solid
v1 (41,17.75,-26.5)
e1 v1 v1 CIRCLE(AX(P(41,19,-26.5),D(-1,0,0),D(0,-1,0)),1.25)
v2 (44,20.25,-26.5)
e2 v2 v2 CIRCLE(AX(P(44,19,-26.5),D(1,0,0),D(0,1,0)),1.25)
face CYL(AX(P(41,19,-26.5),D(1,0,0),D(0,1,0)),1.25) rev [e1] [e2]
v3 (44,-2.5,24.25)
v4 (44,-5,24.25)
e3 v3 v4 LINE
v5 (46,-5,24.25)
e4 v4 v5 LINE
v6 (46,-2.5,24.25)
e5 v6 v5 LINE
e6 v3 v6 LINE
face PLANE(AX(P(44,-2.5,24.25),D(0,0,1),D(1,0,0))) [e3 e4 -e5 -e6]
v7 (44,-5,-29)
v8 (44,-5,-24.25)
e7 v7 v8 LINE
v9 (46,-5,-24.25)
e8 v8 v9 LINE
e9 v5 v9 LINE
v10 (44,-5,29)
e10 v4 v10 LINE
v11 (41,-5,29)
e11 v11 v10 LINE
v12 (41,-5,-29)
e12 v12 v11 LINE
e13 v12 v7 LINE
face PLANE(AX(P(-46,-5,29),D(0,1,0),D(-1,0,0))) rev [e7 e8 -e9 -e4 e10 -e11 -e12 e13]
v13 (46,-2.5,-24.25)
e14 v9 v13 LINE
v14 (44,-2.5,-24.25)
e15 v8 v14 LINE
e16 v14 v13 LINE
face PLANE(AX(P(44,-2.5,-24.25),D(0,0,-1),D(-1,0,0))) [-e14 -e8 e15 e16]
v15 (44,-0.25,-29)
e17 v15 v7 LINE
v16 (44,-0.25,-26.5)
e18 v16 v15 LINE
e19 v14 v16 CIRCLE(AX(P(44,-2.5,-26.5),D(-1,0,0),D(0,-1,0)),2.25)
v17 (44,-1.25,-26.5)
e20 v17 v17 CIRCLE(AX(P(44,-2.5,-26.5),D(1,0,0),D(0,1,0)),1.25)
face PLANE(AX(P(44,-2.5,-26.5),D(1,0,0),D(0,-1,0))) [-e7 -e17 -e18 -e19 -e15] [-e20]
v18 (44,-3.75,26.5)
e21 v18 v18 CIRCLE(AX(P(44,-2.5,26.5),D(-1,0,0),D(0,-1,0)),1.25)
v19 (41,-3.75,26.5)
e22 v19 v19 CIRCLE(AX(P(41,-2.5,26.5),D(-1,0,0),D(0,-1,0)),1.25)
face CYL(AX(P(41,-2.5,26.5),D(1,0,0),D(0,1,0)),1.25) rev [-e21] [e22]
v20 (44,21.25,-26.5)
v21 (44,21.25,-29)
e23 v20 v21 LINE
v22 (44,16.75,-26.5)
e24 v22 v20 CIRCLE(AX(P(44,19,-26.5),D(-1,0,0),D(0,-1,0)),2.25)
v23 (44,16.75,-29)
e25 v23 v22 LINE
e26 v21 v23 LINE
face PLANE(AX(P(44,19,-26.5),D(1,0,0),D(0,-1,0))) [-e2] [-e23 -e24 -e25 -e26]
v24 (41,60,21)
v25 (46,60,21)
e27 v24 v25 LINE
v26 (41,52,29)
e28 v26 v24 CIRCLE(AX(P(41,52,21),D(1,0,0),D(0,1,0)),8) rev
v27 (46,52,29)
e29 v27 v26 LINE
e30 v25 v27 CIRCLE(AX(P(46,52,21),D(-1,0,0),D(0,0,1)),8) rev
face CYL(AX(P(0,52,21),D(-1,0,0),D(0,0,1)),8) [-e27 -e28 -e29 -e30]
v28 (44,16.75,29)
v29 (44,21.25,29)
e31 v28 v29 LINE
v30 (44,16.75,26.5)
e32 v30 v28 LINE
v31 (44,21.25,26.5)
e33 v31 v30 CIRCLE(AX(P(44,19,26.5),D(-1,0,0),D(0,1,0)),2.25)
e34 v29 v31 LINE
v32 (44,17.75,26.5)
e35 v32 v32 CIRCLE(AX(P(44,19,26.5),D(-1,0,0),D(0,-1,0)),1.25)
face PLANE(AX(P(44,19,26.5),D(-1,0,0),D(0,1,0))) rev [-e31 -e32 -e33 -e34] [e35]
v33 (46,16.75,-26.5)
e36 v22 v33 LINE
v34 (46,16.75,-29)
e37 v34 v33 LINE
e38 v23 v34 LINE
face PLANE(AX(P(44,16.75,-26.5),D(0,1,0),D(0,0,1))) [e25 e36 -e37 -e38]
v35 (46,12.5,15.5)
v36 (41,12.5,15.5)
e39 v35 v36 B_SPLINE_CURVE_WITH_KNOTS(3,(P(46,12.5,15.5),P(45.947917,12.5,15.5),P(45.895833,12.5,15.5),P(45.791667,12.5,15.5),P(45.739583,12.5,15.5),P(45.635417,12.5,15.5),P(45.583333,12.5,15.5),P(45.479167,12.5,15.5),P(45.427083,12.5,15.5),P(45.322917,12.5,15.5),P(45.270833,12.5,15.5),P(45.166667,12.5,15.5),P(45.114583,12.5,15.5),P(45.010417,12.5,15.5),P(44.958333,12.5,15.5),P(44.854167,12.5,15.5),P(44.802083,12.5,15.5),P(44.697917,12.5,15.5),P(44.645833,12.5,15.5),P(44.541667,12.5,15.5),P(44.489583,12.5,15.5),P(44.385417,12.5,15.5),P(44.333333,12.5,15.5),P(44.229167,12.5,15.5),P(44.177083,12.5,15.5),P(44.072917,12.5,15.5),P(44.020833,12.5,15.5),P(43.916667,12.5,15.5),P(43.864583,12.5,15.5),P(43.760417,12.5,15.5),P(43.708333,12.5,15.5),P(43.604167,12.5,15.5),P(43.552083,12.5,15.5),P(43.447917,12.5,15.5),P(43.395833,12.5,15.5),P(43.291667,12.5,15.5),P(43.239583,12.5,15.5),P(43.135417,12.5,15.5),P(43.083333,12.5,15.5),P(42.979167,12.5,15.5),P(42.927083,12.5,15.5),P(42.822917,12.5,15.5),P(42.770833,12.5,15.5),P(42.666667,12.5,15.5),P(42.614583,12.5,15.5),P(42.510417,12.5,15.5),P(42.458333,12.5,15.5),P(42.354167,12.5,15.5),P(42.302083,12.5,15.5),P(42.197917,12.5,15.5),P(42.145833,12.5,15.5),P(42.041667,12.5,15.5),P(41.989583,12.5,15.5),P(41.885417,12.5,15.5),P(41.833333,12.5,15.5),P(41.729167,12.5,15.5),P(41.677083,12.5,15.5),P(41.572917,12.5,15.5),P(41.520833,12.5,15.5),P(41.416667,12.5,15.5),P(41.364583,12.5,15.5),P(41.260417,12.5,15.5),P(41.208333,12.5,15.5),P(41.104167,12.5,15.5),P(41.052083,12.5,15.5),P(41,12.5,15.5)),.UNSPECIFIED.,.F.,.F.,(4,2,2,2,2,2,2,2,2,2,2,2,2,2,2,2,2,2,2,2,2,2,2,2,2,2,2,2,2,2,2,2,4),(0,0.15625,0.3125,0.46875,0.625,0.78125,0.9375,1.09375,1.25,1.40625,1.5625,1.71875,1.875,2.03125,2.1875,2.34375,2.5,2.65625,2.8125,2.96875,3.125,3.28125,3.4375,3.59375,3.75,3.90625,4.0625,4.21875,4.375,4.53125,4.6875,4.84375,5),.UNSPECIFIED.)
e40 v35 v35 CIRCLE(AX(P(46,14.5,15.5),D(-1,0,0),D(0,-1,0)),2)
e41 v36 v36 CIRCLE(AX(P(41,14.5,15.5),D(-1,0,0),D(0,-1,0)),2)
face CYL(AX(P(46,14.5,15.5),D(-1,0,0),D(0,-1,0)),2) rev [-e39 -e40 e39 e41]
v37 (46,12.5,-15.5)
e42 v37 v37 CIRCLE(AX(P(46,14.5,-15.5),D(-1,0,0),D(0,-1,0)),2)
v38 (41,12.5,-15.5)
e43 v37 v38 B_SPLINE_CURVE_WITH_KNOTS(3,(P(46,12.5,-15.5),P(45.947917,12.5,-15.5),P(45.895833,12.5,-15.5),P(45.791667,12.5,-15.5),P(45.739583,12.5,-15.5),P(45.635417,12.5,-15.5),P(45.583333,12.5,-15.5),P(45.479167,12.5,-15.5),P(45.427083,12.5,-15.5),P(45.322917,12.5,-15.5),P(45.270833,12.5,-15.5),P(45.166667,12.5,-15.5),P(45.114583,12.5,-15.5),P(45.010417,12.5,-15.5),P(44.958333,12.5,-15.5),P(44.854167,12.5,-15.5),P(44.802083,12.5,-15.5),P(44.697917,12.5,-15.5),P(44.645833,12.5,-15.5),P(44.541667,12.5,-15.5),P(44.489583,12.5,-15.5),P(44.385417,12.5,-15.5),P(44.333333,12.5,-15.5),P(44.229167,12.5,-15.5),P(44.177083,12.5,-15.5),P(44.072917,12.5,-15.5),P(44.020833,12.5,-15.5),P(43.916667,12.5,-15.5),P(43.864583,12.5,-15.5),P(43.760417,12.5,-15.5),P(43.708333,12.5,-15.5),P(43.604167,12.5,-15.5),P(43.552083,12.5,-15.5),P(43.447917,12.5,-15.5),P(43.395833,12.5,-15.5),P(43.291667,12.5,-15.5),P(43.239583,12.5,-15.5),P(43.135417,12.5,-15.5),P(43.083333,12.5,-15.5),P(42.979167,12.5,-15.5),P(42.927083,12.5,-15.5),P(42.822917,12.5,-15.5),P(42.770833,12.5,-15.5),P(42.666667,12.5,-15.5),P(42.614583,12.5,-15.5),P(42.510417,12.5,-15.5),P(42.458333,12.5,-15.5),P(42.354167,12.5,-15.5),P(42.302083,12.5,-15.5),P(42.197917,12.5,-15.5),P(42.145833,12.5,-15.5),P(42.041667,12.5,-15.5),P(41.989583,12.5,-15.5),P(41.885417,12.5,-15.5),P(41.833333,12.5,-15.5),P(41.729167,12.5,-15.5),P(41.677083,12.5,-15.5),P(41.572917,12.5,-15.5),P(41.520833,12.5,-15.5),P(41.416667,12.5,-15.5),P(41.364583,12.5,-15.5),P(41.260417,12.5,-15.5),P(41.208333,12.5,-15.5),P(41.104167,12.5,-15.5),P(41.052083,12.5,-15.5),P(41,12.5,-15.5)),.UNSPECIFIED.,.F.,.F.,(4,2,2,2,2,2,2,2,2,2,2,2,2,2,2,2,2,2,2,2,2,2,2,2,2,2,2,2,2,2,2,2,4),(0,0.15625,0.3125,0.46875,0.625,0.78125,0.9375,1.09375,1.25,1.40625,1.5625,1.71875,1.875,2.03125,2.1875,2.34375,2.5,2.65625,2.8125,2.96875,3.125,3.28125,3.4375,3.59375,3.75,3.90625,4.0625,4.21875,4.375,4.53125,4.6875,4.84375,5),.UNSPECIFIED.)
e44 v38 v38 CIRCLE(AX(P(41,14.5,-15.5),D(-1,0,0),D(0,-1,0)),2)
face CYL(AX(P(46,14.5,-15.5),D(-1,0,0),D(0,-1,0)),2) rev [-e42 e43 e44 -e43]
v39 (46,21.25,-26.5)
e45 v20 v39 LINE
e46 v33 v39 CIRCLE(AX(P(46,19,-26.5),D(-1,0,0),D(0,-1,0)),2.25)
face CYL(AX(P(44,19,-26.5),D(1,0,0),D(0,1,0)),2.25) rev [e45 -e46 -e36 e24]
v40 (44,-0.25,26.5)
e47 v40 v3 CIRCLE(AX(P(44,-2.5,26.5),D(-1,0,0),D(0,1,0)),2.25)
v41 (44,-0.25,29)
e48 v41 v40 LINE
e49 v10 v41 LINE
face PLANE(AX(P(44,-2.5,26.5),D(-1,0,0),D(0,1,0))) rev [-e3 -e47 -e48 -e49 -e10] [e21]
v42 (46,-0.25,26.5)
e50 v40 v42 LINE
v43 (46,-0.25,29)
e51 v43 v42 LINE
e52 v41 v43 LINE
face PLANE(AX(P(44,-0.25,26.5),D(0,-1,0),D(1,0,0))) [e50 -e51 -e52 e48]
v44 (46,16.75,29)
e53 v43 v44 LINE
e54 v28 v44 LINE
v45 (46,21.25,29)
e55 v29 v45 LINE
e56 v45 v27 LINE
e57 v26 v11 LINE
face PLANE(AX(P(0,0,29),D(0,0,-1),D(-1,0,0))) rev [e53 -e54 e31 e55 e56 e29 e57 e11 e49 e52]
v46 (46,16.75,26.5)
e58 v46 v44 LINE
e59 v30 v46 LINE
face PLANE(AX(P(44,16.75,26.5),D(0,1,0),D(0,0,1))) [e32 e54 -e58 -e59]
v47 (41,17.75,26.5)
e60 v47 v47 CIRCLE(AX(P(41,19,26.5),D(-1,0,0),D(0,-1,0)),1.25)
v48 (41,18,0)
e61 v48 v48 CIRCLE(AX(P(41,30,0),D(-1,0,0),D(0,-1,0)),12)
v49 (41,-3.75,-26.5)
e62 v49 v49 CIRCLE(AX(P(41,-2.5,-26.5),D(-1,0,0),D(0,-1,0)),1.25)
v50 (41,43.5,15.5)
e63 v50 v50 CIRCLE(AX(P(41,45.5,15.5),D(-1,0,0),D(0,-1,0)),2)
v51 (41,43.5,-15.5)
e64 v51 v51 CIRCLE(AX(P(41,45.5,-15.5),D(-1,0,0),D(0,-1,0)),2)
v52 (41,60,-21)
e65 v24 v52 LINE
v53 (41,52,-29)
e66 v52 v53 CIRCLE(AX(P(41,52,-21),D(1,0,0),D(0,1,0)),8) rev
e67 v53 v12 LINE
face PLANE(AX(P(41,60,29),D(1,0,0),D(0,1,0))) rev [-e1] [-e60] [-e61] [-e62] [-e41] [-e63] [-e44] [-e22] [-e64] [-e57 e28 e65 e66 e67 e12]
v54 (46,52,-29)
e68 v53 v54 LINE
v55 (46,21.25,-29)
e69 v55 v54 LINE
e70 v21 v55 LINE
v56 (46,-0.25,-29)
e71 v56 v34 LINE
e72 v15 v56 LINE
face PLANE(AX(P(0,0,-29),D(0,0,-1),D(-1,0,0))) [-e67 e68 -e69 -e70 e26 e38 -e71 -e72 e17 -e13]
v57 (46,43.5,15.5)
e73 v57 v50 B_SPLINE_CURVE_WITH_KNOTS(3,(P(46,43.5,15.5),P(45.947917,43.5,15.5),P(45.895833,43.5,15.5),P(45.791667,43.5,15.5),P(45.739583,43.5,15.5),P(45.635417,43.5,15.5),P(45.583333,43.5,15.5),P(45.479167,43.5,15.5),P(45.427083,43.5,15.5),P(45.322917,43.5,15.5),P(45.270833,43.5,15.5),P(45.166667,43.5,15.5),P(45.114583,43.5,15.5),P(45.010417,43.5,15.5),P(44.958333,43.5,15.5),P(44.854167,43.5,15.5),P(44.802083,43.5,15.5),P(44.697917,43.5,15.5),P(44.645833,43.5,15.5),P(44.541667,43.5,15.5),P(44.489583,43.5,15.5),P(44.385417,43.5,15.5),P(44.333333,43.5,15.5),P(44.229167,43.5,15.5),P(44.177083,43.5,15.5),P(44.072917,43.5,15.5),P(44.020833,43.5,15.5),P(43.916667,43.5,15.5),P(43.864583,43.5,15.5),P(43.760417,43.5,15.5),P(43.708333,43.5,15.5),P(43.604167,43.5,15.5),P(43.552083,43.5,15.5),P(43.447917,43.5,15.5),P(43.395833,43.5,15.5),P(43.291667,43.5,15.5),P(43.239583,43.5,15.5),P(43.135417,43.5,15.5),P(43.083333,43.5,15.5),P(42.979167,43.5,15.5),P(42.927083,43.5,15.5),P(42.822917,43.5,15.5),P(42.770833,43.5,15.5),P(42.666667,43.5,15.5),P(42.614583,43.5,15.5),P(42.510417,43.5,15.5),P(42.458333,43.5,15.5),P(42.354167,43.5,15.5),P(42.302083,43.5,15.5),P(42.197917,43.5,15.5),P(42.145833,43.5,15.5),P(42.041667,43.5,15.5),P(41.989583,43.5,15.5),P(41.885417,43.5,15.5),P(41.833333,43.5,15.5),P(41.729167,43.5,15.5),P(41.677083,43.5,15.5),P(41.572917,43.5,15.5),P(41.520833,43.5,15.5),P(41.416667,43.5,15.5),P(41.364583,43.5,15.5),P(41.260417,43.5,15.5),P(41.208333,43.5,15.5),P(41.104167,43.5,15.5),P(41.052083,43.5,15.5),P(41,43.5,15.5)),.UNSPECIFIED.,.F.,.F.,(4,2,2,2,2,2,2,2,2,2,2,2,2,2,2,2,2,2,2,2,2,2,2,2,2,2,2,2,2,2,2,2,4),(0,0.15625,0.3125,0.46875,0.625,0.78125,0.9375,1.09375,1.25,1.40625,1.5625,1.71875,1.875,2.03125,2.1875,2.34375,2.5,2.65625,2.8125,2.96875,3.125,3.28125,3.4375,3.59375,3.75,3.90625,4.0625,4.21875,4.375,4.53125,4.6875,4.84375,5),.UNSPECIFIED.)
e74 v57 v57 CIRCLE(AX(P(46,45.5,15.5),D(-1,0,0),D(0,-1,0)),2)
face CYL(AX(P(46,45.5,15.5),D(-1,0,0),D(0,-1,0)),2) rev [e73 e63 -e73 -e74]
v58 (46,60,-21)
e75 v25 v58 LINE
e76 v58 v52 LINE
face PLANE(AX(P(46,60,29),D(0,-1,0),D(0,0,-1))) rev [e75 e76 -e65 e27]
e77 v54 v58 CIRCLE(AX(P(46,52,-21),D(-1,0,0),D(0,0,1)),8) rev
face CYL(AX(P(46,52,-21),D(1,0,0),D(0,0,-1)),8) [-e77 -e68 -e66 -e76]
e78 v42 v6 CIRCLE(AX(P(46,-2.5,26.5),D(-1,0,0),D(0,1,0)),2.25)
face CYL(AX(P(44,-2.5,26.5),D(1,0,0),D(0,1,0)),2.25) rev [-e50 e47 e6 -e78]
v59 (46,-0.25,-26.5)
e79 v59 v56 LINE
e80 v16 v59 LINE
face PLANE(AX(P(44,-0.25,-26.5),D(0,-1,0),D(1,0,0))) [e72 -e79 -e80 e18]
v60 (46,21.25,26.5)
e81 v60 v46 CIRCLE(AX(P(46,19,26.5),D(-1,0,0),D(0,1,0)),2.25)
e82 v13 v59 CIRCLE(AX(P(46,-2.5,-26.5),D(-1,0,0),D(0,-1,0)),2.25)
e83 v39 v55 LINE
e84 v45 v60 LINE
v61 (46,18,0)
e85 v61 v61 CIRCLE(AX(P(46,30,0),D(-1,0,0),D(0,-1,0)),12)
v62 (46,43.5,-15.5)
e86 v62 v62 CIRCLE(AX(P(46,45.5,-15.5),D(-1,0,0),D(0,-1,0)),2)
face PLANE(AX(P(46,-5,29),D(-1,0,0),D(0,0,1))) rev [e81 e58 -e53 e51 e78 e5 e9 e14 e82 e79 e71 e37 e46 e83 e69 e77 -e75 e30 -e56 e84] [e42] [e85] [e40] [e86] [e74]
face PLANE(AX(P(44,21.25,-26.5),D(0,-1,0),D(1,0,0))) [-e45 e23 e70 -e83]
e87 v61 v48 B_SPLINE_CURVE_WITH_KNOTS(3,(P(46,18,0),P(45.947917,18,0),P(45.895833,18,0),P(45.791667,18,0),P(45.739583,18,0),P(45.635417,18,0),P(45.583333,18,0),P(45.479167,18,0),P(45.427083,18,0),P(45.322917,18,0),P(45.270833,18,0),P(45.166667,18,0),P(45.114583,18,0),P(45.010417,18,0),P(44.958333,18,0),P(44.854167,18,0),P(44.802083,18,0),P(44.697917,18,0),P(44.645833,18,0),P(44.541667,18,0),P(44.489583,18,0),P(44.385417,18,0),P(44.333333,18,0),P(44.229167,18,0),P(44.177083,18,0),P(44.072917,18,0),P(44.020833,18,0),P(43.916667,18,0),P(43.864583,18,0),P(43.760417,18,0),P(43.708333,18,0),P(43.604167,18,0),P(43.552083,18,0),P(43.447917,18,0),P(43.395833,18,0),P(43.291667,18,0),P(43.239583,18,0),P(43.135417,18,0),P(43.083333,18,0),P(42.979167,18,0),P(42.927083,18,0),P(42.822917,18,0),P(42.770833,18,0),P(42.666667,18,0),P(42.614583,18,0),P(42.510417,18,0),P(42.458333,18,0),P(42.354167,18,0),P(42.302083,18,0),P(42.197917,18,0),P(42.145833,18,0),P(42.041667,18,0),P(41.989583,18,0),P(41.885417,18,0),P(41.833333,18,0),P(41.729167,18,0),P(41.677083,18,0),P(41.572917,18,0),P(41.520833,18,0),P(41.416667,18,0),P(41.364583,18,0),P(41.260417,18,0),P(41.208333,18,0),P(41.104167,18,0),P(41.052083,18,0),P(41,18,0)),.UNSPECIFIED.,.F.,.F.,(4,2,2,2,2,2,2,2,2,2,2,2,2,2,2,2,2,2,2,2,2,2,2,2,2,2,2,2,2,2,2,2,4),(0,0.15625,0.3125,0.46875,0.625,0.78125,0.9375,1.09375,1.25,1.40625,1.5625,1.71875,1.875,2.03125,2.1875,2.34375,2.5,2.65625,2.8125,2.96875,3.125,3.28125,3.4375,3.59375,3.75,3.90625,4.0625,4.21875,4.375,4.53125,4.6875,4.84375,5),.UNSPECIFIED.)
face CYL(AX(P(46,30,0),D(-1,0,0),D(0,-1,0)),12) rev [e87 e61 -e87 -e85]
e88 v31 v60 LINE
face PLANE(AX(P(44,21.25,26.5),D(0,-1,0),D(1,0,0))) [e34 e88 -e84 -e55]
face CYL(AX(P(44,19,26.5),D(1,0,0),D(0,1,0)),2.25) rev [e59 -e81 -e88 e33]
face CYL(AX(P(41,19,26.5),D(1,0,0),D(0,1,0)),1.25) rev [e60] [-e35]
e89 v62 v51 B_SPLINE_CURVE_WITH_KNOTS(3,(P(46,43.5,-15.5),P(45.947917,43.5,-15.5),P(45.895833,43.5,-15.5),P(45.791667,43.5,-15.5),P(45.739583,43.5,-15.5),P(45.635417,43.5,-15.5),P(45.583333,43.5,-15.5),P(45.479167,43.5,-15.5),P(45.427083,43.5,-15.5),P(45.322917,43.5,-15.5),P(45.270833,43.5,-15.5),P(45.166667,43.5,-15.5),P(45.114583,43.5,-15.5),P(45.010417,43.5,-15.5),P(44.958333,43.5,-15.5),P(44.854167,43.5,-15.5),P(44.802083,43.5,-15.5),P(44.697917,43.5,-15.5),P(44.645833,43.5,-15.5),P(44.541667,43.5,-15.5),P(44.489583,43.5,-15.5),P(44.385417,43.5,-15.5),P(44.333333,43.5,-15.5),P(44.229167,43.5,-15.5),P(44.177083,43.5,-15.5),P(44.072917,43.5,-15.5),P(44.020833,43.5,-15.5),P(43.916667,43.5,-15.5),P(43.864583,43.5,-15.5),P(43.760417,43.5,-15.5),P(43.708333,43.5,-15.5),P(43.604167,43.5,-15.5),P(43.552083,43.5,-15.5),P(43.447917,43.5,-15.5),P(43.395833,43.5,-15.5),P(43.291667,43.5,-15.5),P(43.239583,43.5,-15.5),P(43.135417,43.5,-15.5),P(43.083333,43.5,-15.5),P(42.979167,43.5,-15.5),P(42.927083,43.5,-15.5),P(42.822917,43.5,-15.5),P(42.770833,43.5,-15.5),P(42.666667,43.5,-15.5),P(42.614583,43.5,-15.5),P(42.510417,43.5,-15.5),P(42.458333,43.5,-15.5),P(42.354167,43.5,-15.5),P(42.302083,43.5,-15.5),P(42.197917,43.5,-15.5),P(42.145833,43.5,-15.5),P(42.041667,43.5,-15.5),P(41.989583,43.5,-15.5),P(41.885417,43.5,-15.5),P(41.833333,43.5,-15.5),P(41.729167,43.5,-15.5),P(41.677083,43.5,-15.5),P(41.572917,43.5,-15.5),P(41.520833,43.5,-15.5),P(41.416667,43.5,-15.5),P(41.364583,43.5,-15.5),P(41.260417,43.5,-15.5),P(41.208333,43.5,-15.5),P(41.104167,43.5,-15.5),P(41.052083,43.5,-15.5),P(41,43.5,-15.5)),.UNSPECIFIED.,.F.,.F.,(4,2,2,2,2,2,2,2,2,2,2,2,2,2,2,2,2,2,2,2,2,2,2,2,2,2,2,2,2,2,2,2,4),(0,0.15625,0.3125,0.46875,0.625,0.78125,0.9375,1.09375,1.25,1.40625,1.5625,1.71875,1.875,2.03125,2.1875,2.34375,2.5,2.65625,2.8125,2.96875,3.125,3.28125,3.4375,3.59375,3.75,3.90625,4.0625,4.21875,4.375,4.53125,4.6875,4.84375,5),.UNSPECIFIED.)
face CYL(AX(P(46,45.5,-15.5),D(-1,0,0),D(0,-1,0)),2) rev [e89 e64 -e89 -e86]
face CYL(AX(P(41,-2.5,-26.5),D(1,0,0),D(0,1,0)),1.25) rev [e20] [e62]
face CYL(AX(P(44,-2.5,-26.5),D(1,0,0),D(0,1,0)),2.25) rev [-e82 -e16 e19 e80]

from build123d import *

# Parameters (mm, degrees)
RESSALTO_EXTRUS_O1_DEPTH  = 29
CORTE_EXTRUS_O1_REACH     = 115.6
ESBO_O2_R                 = 6.5
ESBO_O3_R                 = 18
CORTE_EXTRUS_O2_DEPTH     = 2.5
CORTE_EXTRUS_O3_START     = -5
ESBO_O5_R                 = 2
ESBO_O5_R_2               = 1.5
CORTE_EXTRUS_O3_DEPTH     = 5
ESBO_O7_R                 = 12
ESBO_O7_R_2               = 2
CORTE_EXTRUS_O4_DEPTH     = 110.590145542
ESBO_O11_W                = 18
ESBO_O11_H                = 10
RESSALTO_EXTRUS_O3_DEPTH  = 8
ESBO_O12_W                = 14.4
ESBO_O12_H                = 6.8
CORTE_EXTRUS_O6_DEPTH     = 3
ESBO_O13_W                = 13.4
ESBO_O13_H                = 5.8
CORTE_EXTRUS_O7_DEPTH     = 5
CORTE_EXTRUS_O8_REACH     = 84.898
RESSALTO_EXTRUS_O4_DEPTH  = 5
ESBO_O17_W                = 2.6
ESBO_O17_H                = 10
RESSALTO_EXTRUS_O5_DEPTH  = 8
CHANFRO1_SIZE             = 5
FILETE1_R                 = 8
ESBO_O18_W                = 20
ESBO_O18_H                = 8
RESSALTO_EXTRUS_O6_DEPTH  = 13
ESBO_O19_R                = 2.25
CORTE_EXTRUS_O9_DEPTH     = 80.252760204
CHANFRO2_SIZE             = 3
CHANFRO2_SIZE_2           = 13
CORTE_EXTRUS_O10_START    = -6
CORTE_EXTRUS_O10_DEPTH    = 74.252760204
ESBO_O21_W                = 26
ESBO_O21_H                = 16
RESSALTO_EXTRUS_O7_DEPTH  = 30
CORTE_EXTRUS_O11_DEPTH    = 26
ESBO_O24_R                = 1
ESBO_O24_W                = 17.2
ESBO_O24_H                = 3
RESSALTO_EXTRUS_O8_DEPTH  = 3
ESBO_O25_W                = 11.2
ESBO_O25_H                = 4
CORTE_EXTRUS_O12_DEPTH    = 2
ESBO_O26_R                = 3.5
CORTE_EXTRUS_O13_DEPTH    = 96.289033997
ESBO_O27_W                = 24
ESBO_O27_H                = 8
RESSALTO_EXTRUS_O9_DEPTH  = 6
ESBO_O28_W                = 1.5
ESBO_O28_H                = 8
RESSALTO_EXTRUS_O10_DEPTH = 2
ESBO_O31_R                = 1
CORTE_EXTRUS_O14_DEPTH    = 85.172442046
ESBO_O32_R                = 1
CORTE_EXTRUS_O15_DEPTH    = 12
ESBO_O33_R                = 1.25
CORTE_EXTRUS_O16_DEPTH    = 5
CORTE_EXTRUS_O17_DEPTH    = 2
ESBO_O36_R                = 71.402948567
CORTE_EXTRUS_O18_DEPTH    = 114.723348526


with BuildPart() as part:
    # Esboço1 → Ressalto-extrusão1 (new, symmetric)
    with BuildSketch(Plane.XY):
        Polygon((0, 0), (-41, 0), (-41, 60), (-46, 60), (-46, -5), (46, -5), (46, 60), (41, 60), (41, 0), align=None)
    extrude(amount=RESSALTO_EXTRUS_O1_DEPTH, both=True)

    # Esboço2 → Corte-extrusão1 (cut, up to next)
    with BuildSketch(Plane.ZY.offset(46), mode=Mode.PRIVATE) as corte_extrus_o1_sk1:
        with Locations(Location((0, 30, 0), (0, 0, 270))):
            Circle(ESBO_O2_R)
    corte_extrus_o1_tool1 = extrude(corte_extrus_o1_sk1.sketch, amount=-CORTE_EXTRUS_O1_REACH, mode=Mode.PRIVATE) & part.part
    add(corte_extrus_o1_tool1.solids().sort_by_distance((-46, 30, 0))[0], mode=Mode.SUBTRACT)

    # Esboço3 → Corte-extrusão2 (cut)
    with BuildSketch(Plane.ZY.offset(46)):
        with Locations(Location((0, 30, 0), (0, 0, 270))):
            Circle(ESBO_O3_R)
    extrude(amount=-CORTE_EXTRUS_O2_DEPTH, mode=Mode.SUBTRACT)

    # Esboço5 → Corte-extrusão3 (cut)
    with BuildSketch(Plane.ZY.offset(46).offset(CORTE_EXTRUS_O3_START)):
        with Locations(Location((-15.5, 45.5, 0), (0, 0, 270))):
            Circle(ESBO_O5_R)
        with Locations(Location((0, 42, 0), (0, 0, 270))):
            Circle(ESBO_O5_R_2)
        with Locations(Location((0, 18, 0), (0, 0, 270))):
            Circle(ESBO_O5_R_2)
        with Locations(Location((0, 54, 0), (0, 0, 270))):
            Circle(ESBO_O5_R)
        with Locations(Location((15.5, 45.5, 0), (0, 0, 270))):
            Circle(ESBO_O5_R)
        with Locations(Location((15.5, 14.5, 0), (0, 0, 270))):
            Circle(ESBO_O5_R)
        with Locations(Location((-15.5, 14.5, 0), (0, 0, 270))):
            Circle(ESBO_O5_R)
        with Locations(Location((20.784609691, 18, 0), (0, 0, 270))):
            Circle(ESBO_O5_R)
        with Locations(Location((-20.784609691, 18, 0), (0, 0, 270))):
            Circle(ESBO_O5_R)
        with BuildLine():
            Line((-8, 31.5), (8, 31.5))
            ThreePointArc((8, 31.5), (9.5, 30), (8, 28.5))
            Line((8, 28.5), (-8, 28.5))
            ThreePointArc((-8, 28.5), (-9.5, 30), (-8, 31.5))
        make_face()
    extrude(amount=CORTE_EXTRUS_O3_DEPTH, mode=Mode.SUBTRACT)

    # Esboço7 → Corte-extrusão4 (cut, through all)
    with BuildSketch(Plane.ZY.offset(-41)):
        with Locations(Location((0, 30, 0), (0, 0, 270))):
            Circle(ESBO_O7_R)
        with Locations(Location((-15.5, 45.5, 0), (0, 0, 270))):
            Circle(ESBO_O7_R_2)
        with Locations(Location((15.5, 45.5, 0), (0, 0, 270))):
            Circle(ESBO_O7_R_2)
        with Locations(Location((15.5, 14.5, 0), (0, 0, 270))):
            Circle(ESBO_O7_R_2)
        with Locations(Location((-15.5, 14.5, 0), (0, 0, 270))):
            Circle(ESBO_O7_R_2)
    extrude(amount=-CORTE_EXTRUS_O4_DEPTH, mode=Mode.SUBTRACT)

    # Esboço11 → Ressalto-extrusão3 (add)
    with BuildSketch(Plane(origin=(0, 0, 0), x_dir=(1, 0, 0), z_dir=(0, 1, 0))):
        with Locations((-29.4, 0)):
            Rectangle(ESBO_O11_W, ESBO_O11_H)
    extrude(amount=RESSALTO_EXTRUS_O3_DEPTH)

    # Esboço12 → Corte-extrusão6 (cut)
    with BuildSketch(Plane(origin=(0, 8, 0), x_dir=(1, 0, 0), z_dir=(0, 1, 0))):
        with Locations((-29.4, 0)):
            Rectangle(ESBO_O12_W, ESBO_O12_H)
    extrude(amount=-CORTE_EXTRUS_O6_DEPTH, mode=Mode.SUBTRACT)

    # Esboço13 → Corte-extrusão7 (cut)
    with BuildSketch(Plane(origin=(0, 5, 0), x_dir=(1, 0, 0), z_dir=(0, 1, 0))):
        with Locations((-29.4, 0)):
            Rectangle(ESBO_O13_W, ESBO_O13_H)
    extrude(amount=-CORTE_EXTRUS_O7_DEPTH, mode=Mode.SUBTRACT)

    # Esboço14 → Corte-extrusão8 (cut, up to next)
    with BuildSketch(Plane.XY.offset(5), mode=Mode.PRIVATE) as corte_extrus_o8_sk1:
        with BuildLine():
            Line((-33.4, 0), (-25.4, 0))
            ThreePointArc((-25.4, 0), (-29.4, 4), (-33.4, 0))
        make_face()
    corte_extrus_o8_tool1 = extrude(corte_extrus_o8_sk1.sketch, amount=-CORTE_EXTRUS_O8_REACH, mode=Mode.PRIVATE) & part.part
    add(corte_extrus_o8_tool1.solids().sort_by_distance((-29.4, 1.697653, 5))[0], mode=Mode.SUBTRACT)

    # Esboço16 → Ressalto-extrusão4 (add)
    with BuildSketch(Plane.XY.offset(29)):
        Polygon((-41, 32), (-21, 12), (21, 12), (41, 32), (41, 0), (-41, 0), align=None)
    ressalto_extrus_o4 = extrude(amount=-RESSALTO_EXTRUS_O4_DEPTH)

    # Espelhar1: Ressalto-extrusão4 across plane
    add(ressalto_extrus_o4.mirror(Plane.XY))

    # Esboço17 → Ressalto-extrusão5 (add)
    with BuildSketch(Plane(origin=(0, 8, 0), x_dir=(1, 0, 0), z_dir=(0, 1, 0))):
        with Locations((-39.7, 0)):
            Rectangle(ESBO_O17_W, ESBO_O17_H)
    extrude(amount=-RESSALTO_EXTRUS_O5_DEPTH)

    # Chanfro1
    chanfro1_edges = [part.edges().sort_by_distance(p)[0] for p in [
        (41, 0, 0),
        (-41, 0, 14.5),
        (-41, 0, -14.5),
    ]]
    chamfer(chanfro1_edges, length=CHANFRO1_SIZE)

    # Filete1
    filete1_edges = [part.edges().sort_by_distance(p)[0] for p in [
        (-43.5, 60, -29),
        (-43.5, 60, 29),
        (-41, 32, 26.5),
        (-21, 12, 26.5),
        (21, 12, 26.5),
        (41, 32, 26.5),
        (-41, 32, -26.5),
        (41, 32, -26.5),
        (21, 12, -26.5),
        (-21, 12, -26.5),
        (43.5, 60, 29),
        (43.5, 60, -29),
    ]]
    fillet(filete1_edges, radius=FILETE1_R)

    # Esboço18 → Ressalto-extrusão6 (add)
    with BuildSketch(Plane.XY.offset(29)):
        with Locations((22, 7)):
            Rectangle(ESBO_O18_W, ESBO_O18_H)
    extrude(amount=RESSALTO_EXTRUS_O6_DEPTH)

    # Esboço19 → Corte-extrusão9 (cut, through all)
    with BuildSketch(Plane(origin=(0, 11, 0), x_dir=(1, 0, 0), z_dir=(0, 1, 0))):
        with Locations(Location((18, -35.75, 0), (0, 0, 270))):
            Circle(ESBO_O19_R)
        with Locations(Location((26, -35.75, 0), (0, 0, 270))):
            Circle(ESBO_O19_R)
    extrude(amount=-CORTE_EXTRUS_O9_DEPTH, mode=Mode.SUBTRACT)

    # Chanfro2
    # the kernel refuses this chamfer: 13, 3 mm, written as the material it adds along each edge
    with BuildSketch(Plane(origin=(12, 3, 29), x_dir=(0, -0.987043568605235, -0.1604524654688814), z_dir=(1, 0, 0))) as chanfro2_piece_1_section:
        Polygon((CHANFRO2_SIZE * 0.987043568605, -CHANFRO2_SIZE * 0.160452465469), (-CHANFRO2_SIZE_2 * 0.160452465469, -CHANFRO2_SIZE_2 * 0.987043568605), (0, 0), align=None)
    chanfro2_piece_1 = extrude(amount=20, mode=Mode.PRIVATE)
    chanfro2_piece_1 = split(chanfro2_piece_1, bisect_by=Plane(origin=(21.999997786, 2.099377296, 42), z_dir=(0, 0, -1)), keep=Keep.TOP, mode=Mode.PRIVATE)
    chanfro2_piece_1 = chanfro2_piece_1 - Plane(origin=(18, 2.099377296, 35.75), x_dir=(0, 0, 1), z_dir=(0, 1, 0)) * Cylinder(2.25, 92, mode=Mode.PRIVATE)
    chanfro2_piece_1 = chanfro2_piece_1 - Plane(origin=(26, 2.099377296, 35.75), x_dir=(0, 0, 1), z_dir=(0, 1, 0)) * Cylinder(2.25, 92, mode=Mode.PRIVATE)
    add(chanfro2_piece_1)

    # Esboço20 → Corte-extrusão10 (cut, through all)
    with BuildSketch(Plane(origin=(0, 11, 0), x_dir=(1, 0, 0), z_dir=(0, 1, 0)).offset(CORTE_EXTRUS_O10_START)):
        with BuildLine():
            Line((18, -31.5), (26, -31.5))
            ThreePointArc((26, -31.5), (30.25, -35.75), (26, -40))
            Line((26, -40), (18, -40))
            ThreePointArc((18, -40), (13.75, -35.75), (18, -31.5))
        make_face()
    extrude(amount=-CORTE_EXTRUS_O10_DEPTH, mode=Mode.SUBTRACT)

    # Esboço21 → Ressalto-extrusão7 (add)
    with BuildSketch(Plane(origin=(0, 0, 0), x_dir=(1, 0, 0), z_dir=(0, 1, 0))):
        with Locations((-1, 0)):
            Rectangle(ESBO_O21_W, ESBO_O21_H)
    extrude(amount=RESSALTO_EXTRUS_O7_DEPTH)

    # Esboço22 → Corte-extrusão11 (cut)
    with BuildSketch(Plane(origin=(12, 0, 0), x_dir=(0, 0, -1), z_dir=(1, 0, 0))):
        Polygon((6.812733176, 30), (3.406366588, 35.9), (-3.406366588, 35.9), (-6.812733176, 30), (-3.406366588, 24.1), (3.406366588, 24.1), align=None)
    extrude(amount=-CORTE_EXTRUS_O11_DEPTH, mode=Mode.SUBTRACT)

    # Esboço24 → Ressalto-extrusão8 (add)
    # profile 1 of 2: a face of its own
    with BuildSketch(Plane(origin=(0, 0, 0), x_dir=(1, 0, 0), z_dir=(0, 1, 0))):
        with BuildLine():
            Line((17.282291959, 14), (32.482291959, 14))
            ThreePointArc((32.482291959, 14), (34.482291959, 12), (32.482291959, 10))
            Line((32.482291959, 10), (17.282291959, 10))
            ThreePointArc((17.282291959, 10), (15.282291959, 12), (17.282291959, 14))
        make_face()
        with Locations(Location((17.282291959, 12, 0), (0, 0, 180))):
            Circle(ESBO_O24_R, mode=Mode.SUBTRACT)
        with Locations(Location((32.482291959, 12, 0), (0, 0, 180))):
            Circle(ESBO_O24_R, mode=Mode.SUBTRACT)
    # profile 2 of 2: a face of its own
    with BuildSketch(Plane(origin=(0, 0, 0), x_dir=(1, 0, 0), z_dir=(0, 1, 0))):
        with Locations((24.882291959, -8.5)):
            Rectangle(ESBO_O24_W, ESBO_O24_H)
    extrude(amount=RESSALTO_EXTRUS_O8_DEPTH)

    # Esboço25 → Corte-extrusão12 (cut)
    with BuildSketch(Plane(origin=(0, 3, 0), x_dir=(1, 0, 0), z_dir=(0, 1, 0))):
        with Locations((24.882291959, 12)):
            Rectangle(ESBO_O25_W, ESBO_O25_H)
    extrude(amount=-CORTE_EXTRUS_O12_DEPTH, mode=Mode.SUBTRACT)

    # Esboço26 → Corte-extrusão13 (cut, through all)
    with BuildSketch(Plane.XY.offset(29)):
        with Locations((36, 5)):
            Circle(ESBO_O26_R)
    extrude(amount=-CORTE_EXTRUS_O13_DEPTH, mode=Mode.SUBTRACT)

    # Esboço27 → Ressalto-extrusão9 (add)
    with BuildSketch(Plane(origin=(0, 0, 0), x_dir=(1, 0, 0), z_dir=(0, 1, 0))):
        with Locations((-4, 16)):
            Rectangle(ESBO_O27_W, ESBO_O27_H)
    extrude(amount=RESSALTO_EXTRUS_O9_DEPTH)

    # Esboço28 → Ressalto-extrusão10 (add)
    with BuildSketch(Plane(origin=(0, 6, 0), x_dir=(1, 0, 0), z_dir=(0, 1, 0))):
        with Locations((-15.25, 16)):
            Rectangle(ESBO_O28_W, ESBO_O28_H)
        with Locations((7.25, 16)):
            Rectangle(ESBO_O28_W, ESBO_O28_H)
    extrude(amount=RESSALTO_EXTRUS_O10_DEPTH)

    # Esboço31 → Corte-extrusão14 (cut, through all)
    with BuildSketch(Plane.XY.offset(8)):
        with Locations((-10, 22.5)):
            Circle(ESBO_O31_R)
        with Locations((8, 22.5)):
            Circle(ESBO_O31_R)
    extrude(amount=-CORTE_EXTRUS_O14_DEPTH, mode=Mode.SUBTRACT)

    # Esboço32 → Corte-extrusão15 (cut)
    with BuildSketch(Plane.ZY.offset(46)):
        with Locations(Location((-26.5, -2.5, 0), (0, 0, 270))):
            Circle(ESBO_O32_R)
        with Locations(Location((-26.5, 19, 0), (0, 0, 270))):
            Circle(ESBO_O32_R)
        with Locations(Location((26.5, 19, 0), (0, 0, 90))):
            Circle(ESBO_O32_R)
        with Locations(Location((26.5, -2.5, 0), (0, 0, 90))):
            Circle(ESBO_O32_R)
    corte_extrus_o15 = extrude(amount=-CORTE_EXTRUS_O15_DEPTH, mode=Mode.SUBTRACT)

    # Esboço33 → Corte-extrusão16 (cut)
    with BuildSketch(Plane.ZY.offset(46)):
        with Locations(Location((-26.5, -2.5, 0), (0, 0, 270))):
            Circle(ESBO_O33_R)
        with Locations(Location((-26.5, 19, 0), (0, 0, 270))):
            Circle(ESBO_O33_R)
        with Locations(Location((26.5, 19, 0), (0, 0, 90))):
            Circle(ESBO_O33_R)
        with Locations(Location((26.5, -2.5, 0), (0, 0, 90))):
            Circle(ESBO_O33_R)
    corte_extrus_o16 = extrude(amount=-CORTE_EXTRUS_O16_DEPTH, mode=Mode.SUBTRACT)

    # Esboço34 → Corte-extrusão17 (cut)
    with BuildSketch(Plane.ZY.offset(46)):
        with BuildLine():
            Line((-26.5, -0.25), (-29, -0.25))
            Line((-29, -0.25), (-29, -5))
            Line((-29, -5), (-24.25, -5))
            Line((-24.25, -5), (-24.25, -2.5))
            ThreePointArc((-24.25, -2.5), (-24.909009742, -0.909009742), (-26.5, -0.25))
        make_face()
        with BuildLine():
            Line((-26.5, 21.25), (-29, 21.25))
            Line((-29, 21.25), (-29, 16.75))
            Line((-29, 16.75), (-26.5, 16.75))
            ThreePointArc((-26.5, 16.75), (-24.25, 19), (-26.5, 21.25))
        make_face()
        with BuildLine():
            Line((29, 16.75), (29, 21.25))
            Line((29, 21.25), (26.5, 21.25))
            ThreePointArc((26.5, 21.25), (24.25, 19), (26.5, 16.75))
            Line((26.5, 16.75), (29, 16.75))
        make_face()
        with BuildLine():
            Line((29, -5), (24.25, -5))
            Line((24.25, -5), (24.25, -2.5))
            ThreePointArc((24.25, -2.5), (24.909009742, -0.909009742), (26.5, -0.25))
            Line((26.5, -0.25), (29, -0.25))
            Line((29, -0.25), (29, -5))
        make_face()
    corte_extrus_o17 = extrude(amount=-CORTE_EXTRUS_O17_DEPTH, mode=Mode.SUBTRACT)

    # Espelhar2: Corte-extrusão15, Corte-extrusão16, Corte-extrusão17 across plane
    add(corte_extrus_o15.mirror(Plane(origin=(0, 0, 0), x_dir=(0, 0, 1), z_dir=(1, 0, 0))), mode=Mode.SUBTRACT)
    add(corte_extrus_o16.mirror(Plane(origin=(0, 0, 0), x_dir=(0, 0, 1), z_dir=(1, 0, 0))), mode=Mode.SUBTRACT)
    add(corte_extrus_o17.mirror(Plane(origin=(0, 0, 0), x_dir=(0, 0, 1), z_dir=(1, 0, 0))), mode=Mode.SUBTRACT)

    # Esboço36 → Corte-extrusão18 (cut, through all)
    with BuildSketch(Plane.ZY.offset(-41)):
        with Locations((0, 30)):
            Circle(ESBO_O36_R)
    extrude(amount=CORTE_EXTRUS_O18_DEPTH, mode=Mode.SUBTRACT)


solid = part.part
